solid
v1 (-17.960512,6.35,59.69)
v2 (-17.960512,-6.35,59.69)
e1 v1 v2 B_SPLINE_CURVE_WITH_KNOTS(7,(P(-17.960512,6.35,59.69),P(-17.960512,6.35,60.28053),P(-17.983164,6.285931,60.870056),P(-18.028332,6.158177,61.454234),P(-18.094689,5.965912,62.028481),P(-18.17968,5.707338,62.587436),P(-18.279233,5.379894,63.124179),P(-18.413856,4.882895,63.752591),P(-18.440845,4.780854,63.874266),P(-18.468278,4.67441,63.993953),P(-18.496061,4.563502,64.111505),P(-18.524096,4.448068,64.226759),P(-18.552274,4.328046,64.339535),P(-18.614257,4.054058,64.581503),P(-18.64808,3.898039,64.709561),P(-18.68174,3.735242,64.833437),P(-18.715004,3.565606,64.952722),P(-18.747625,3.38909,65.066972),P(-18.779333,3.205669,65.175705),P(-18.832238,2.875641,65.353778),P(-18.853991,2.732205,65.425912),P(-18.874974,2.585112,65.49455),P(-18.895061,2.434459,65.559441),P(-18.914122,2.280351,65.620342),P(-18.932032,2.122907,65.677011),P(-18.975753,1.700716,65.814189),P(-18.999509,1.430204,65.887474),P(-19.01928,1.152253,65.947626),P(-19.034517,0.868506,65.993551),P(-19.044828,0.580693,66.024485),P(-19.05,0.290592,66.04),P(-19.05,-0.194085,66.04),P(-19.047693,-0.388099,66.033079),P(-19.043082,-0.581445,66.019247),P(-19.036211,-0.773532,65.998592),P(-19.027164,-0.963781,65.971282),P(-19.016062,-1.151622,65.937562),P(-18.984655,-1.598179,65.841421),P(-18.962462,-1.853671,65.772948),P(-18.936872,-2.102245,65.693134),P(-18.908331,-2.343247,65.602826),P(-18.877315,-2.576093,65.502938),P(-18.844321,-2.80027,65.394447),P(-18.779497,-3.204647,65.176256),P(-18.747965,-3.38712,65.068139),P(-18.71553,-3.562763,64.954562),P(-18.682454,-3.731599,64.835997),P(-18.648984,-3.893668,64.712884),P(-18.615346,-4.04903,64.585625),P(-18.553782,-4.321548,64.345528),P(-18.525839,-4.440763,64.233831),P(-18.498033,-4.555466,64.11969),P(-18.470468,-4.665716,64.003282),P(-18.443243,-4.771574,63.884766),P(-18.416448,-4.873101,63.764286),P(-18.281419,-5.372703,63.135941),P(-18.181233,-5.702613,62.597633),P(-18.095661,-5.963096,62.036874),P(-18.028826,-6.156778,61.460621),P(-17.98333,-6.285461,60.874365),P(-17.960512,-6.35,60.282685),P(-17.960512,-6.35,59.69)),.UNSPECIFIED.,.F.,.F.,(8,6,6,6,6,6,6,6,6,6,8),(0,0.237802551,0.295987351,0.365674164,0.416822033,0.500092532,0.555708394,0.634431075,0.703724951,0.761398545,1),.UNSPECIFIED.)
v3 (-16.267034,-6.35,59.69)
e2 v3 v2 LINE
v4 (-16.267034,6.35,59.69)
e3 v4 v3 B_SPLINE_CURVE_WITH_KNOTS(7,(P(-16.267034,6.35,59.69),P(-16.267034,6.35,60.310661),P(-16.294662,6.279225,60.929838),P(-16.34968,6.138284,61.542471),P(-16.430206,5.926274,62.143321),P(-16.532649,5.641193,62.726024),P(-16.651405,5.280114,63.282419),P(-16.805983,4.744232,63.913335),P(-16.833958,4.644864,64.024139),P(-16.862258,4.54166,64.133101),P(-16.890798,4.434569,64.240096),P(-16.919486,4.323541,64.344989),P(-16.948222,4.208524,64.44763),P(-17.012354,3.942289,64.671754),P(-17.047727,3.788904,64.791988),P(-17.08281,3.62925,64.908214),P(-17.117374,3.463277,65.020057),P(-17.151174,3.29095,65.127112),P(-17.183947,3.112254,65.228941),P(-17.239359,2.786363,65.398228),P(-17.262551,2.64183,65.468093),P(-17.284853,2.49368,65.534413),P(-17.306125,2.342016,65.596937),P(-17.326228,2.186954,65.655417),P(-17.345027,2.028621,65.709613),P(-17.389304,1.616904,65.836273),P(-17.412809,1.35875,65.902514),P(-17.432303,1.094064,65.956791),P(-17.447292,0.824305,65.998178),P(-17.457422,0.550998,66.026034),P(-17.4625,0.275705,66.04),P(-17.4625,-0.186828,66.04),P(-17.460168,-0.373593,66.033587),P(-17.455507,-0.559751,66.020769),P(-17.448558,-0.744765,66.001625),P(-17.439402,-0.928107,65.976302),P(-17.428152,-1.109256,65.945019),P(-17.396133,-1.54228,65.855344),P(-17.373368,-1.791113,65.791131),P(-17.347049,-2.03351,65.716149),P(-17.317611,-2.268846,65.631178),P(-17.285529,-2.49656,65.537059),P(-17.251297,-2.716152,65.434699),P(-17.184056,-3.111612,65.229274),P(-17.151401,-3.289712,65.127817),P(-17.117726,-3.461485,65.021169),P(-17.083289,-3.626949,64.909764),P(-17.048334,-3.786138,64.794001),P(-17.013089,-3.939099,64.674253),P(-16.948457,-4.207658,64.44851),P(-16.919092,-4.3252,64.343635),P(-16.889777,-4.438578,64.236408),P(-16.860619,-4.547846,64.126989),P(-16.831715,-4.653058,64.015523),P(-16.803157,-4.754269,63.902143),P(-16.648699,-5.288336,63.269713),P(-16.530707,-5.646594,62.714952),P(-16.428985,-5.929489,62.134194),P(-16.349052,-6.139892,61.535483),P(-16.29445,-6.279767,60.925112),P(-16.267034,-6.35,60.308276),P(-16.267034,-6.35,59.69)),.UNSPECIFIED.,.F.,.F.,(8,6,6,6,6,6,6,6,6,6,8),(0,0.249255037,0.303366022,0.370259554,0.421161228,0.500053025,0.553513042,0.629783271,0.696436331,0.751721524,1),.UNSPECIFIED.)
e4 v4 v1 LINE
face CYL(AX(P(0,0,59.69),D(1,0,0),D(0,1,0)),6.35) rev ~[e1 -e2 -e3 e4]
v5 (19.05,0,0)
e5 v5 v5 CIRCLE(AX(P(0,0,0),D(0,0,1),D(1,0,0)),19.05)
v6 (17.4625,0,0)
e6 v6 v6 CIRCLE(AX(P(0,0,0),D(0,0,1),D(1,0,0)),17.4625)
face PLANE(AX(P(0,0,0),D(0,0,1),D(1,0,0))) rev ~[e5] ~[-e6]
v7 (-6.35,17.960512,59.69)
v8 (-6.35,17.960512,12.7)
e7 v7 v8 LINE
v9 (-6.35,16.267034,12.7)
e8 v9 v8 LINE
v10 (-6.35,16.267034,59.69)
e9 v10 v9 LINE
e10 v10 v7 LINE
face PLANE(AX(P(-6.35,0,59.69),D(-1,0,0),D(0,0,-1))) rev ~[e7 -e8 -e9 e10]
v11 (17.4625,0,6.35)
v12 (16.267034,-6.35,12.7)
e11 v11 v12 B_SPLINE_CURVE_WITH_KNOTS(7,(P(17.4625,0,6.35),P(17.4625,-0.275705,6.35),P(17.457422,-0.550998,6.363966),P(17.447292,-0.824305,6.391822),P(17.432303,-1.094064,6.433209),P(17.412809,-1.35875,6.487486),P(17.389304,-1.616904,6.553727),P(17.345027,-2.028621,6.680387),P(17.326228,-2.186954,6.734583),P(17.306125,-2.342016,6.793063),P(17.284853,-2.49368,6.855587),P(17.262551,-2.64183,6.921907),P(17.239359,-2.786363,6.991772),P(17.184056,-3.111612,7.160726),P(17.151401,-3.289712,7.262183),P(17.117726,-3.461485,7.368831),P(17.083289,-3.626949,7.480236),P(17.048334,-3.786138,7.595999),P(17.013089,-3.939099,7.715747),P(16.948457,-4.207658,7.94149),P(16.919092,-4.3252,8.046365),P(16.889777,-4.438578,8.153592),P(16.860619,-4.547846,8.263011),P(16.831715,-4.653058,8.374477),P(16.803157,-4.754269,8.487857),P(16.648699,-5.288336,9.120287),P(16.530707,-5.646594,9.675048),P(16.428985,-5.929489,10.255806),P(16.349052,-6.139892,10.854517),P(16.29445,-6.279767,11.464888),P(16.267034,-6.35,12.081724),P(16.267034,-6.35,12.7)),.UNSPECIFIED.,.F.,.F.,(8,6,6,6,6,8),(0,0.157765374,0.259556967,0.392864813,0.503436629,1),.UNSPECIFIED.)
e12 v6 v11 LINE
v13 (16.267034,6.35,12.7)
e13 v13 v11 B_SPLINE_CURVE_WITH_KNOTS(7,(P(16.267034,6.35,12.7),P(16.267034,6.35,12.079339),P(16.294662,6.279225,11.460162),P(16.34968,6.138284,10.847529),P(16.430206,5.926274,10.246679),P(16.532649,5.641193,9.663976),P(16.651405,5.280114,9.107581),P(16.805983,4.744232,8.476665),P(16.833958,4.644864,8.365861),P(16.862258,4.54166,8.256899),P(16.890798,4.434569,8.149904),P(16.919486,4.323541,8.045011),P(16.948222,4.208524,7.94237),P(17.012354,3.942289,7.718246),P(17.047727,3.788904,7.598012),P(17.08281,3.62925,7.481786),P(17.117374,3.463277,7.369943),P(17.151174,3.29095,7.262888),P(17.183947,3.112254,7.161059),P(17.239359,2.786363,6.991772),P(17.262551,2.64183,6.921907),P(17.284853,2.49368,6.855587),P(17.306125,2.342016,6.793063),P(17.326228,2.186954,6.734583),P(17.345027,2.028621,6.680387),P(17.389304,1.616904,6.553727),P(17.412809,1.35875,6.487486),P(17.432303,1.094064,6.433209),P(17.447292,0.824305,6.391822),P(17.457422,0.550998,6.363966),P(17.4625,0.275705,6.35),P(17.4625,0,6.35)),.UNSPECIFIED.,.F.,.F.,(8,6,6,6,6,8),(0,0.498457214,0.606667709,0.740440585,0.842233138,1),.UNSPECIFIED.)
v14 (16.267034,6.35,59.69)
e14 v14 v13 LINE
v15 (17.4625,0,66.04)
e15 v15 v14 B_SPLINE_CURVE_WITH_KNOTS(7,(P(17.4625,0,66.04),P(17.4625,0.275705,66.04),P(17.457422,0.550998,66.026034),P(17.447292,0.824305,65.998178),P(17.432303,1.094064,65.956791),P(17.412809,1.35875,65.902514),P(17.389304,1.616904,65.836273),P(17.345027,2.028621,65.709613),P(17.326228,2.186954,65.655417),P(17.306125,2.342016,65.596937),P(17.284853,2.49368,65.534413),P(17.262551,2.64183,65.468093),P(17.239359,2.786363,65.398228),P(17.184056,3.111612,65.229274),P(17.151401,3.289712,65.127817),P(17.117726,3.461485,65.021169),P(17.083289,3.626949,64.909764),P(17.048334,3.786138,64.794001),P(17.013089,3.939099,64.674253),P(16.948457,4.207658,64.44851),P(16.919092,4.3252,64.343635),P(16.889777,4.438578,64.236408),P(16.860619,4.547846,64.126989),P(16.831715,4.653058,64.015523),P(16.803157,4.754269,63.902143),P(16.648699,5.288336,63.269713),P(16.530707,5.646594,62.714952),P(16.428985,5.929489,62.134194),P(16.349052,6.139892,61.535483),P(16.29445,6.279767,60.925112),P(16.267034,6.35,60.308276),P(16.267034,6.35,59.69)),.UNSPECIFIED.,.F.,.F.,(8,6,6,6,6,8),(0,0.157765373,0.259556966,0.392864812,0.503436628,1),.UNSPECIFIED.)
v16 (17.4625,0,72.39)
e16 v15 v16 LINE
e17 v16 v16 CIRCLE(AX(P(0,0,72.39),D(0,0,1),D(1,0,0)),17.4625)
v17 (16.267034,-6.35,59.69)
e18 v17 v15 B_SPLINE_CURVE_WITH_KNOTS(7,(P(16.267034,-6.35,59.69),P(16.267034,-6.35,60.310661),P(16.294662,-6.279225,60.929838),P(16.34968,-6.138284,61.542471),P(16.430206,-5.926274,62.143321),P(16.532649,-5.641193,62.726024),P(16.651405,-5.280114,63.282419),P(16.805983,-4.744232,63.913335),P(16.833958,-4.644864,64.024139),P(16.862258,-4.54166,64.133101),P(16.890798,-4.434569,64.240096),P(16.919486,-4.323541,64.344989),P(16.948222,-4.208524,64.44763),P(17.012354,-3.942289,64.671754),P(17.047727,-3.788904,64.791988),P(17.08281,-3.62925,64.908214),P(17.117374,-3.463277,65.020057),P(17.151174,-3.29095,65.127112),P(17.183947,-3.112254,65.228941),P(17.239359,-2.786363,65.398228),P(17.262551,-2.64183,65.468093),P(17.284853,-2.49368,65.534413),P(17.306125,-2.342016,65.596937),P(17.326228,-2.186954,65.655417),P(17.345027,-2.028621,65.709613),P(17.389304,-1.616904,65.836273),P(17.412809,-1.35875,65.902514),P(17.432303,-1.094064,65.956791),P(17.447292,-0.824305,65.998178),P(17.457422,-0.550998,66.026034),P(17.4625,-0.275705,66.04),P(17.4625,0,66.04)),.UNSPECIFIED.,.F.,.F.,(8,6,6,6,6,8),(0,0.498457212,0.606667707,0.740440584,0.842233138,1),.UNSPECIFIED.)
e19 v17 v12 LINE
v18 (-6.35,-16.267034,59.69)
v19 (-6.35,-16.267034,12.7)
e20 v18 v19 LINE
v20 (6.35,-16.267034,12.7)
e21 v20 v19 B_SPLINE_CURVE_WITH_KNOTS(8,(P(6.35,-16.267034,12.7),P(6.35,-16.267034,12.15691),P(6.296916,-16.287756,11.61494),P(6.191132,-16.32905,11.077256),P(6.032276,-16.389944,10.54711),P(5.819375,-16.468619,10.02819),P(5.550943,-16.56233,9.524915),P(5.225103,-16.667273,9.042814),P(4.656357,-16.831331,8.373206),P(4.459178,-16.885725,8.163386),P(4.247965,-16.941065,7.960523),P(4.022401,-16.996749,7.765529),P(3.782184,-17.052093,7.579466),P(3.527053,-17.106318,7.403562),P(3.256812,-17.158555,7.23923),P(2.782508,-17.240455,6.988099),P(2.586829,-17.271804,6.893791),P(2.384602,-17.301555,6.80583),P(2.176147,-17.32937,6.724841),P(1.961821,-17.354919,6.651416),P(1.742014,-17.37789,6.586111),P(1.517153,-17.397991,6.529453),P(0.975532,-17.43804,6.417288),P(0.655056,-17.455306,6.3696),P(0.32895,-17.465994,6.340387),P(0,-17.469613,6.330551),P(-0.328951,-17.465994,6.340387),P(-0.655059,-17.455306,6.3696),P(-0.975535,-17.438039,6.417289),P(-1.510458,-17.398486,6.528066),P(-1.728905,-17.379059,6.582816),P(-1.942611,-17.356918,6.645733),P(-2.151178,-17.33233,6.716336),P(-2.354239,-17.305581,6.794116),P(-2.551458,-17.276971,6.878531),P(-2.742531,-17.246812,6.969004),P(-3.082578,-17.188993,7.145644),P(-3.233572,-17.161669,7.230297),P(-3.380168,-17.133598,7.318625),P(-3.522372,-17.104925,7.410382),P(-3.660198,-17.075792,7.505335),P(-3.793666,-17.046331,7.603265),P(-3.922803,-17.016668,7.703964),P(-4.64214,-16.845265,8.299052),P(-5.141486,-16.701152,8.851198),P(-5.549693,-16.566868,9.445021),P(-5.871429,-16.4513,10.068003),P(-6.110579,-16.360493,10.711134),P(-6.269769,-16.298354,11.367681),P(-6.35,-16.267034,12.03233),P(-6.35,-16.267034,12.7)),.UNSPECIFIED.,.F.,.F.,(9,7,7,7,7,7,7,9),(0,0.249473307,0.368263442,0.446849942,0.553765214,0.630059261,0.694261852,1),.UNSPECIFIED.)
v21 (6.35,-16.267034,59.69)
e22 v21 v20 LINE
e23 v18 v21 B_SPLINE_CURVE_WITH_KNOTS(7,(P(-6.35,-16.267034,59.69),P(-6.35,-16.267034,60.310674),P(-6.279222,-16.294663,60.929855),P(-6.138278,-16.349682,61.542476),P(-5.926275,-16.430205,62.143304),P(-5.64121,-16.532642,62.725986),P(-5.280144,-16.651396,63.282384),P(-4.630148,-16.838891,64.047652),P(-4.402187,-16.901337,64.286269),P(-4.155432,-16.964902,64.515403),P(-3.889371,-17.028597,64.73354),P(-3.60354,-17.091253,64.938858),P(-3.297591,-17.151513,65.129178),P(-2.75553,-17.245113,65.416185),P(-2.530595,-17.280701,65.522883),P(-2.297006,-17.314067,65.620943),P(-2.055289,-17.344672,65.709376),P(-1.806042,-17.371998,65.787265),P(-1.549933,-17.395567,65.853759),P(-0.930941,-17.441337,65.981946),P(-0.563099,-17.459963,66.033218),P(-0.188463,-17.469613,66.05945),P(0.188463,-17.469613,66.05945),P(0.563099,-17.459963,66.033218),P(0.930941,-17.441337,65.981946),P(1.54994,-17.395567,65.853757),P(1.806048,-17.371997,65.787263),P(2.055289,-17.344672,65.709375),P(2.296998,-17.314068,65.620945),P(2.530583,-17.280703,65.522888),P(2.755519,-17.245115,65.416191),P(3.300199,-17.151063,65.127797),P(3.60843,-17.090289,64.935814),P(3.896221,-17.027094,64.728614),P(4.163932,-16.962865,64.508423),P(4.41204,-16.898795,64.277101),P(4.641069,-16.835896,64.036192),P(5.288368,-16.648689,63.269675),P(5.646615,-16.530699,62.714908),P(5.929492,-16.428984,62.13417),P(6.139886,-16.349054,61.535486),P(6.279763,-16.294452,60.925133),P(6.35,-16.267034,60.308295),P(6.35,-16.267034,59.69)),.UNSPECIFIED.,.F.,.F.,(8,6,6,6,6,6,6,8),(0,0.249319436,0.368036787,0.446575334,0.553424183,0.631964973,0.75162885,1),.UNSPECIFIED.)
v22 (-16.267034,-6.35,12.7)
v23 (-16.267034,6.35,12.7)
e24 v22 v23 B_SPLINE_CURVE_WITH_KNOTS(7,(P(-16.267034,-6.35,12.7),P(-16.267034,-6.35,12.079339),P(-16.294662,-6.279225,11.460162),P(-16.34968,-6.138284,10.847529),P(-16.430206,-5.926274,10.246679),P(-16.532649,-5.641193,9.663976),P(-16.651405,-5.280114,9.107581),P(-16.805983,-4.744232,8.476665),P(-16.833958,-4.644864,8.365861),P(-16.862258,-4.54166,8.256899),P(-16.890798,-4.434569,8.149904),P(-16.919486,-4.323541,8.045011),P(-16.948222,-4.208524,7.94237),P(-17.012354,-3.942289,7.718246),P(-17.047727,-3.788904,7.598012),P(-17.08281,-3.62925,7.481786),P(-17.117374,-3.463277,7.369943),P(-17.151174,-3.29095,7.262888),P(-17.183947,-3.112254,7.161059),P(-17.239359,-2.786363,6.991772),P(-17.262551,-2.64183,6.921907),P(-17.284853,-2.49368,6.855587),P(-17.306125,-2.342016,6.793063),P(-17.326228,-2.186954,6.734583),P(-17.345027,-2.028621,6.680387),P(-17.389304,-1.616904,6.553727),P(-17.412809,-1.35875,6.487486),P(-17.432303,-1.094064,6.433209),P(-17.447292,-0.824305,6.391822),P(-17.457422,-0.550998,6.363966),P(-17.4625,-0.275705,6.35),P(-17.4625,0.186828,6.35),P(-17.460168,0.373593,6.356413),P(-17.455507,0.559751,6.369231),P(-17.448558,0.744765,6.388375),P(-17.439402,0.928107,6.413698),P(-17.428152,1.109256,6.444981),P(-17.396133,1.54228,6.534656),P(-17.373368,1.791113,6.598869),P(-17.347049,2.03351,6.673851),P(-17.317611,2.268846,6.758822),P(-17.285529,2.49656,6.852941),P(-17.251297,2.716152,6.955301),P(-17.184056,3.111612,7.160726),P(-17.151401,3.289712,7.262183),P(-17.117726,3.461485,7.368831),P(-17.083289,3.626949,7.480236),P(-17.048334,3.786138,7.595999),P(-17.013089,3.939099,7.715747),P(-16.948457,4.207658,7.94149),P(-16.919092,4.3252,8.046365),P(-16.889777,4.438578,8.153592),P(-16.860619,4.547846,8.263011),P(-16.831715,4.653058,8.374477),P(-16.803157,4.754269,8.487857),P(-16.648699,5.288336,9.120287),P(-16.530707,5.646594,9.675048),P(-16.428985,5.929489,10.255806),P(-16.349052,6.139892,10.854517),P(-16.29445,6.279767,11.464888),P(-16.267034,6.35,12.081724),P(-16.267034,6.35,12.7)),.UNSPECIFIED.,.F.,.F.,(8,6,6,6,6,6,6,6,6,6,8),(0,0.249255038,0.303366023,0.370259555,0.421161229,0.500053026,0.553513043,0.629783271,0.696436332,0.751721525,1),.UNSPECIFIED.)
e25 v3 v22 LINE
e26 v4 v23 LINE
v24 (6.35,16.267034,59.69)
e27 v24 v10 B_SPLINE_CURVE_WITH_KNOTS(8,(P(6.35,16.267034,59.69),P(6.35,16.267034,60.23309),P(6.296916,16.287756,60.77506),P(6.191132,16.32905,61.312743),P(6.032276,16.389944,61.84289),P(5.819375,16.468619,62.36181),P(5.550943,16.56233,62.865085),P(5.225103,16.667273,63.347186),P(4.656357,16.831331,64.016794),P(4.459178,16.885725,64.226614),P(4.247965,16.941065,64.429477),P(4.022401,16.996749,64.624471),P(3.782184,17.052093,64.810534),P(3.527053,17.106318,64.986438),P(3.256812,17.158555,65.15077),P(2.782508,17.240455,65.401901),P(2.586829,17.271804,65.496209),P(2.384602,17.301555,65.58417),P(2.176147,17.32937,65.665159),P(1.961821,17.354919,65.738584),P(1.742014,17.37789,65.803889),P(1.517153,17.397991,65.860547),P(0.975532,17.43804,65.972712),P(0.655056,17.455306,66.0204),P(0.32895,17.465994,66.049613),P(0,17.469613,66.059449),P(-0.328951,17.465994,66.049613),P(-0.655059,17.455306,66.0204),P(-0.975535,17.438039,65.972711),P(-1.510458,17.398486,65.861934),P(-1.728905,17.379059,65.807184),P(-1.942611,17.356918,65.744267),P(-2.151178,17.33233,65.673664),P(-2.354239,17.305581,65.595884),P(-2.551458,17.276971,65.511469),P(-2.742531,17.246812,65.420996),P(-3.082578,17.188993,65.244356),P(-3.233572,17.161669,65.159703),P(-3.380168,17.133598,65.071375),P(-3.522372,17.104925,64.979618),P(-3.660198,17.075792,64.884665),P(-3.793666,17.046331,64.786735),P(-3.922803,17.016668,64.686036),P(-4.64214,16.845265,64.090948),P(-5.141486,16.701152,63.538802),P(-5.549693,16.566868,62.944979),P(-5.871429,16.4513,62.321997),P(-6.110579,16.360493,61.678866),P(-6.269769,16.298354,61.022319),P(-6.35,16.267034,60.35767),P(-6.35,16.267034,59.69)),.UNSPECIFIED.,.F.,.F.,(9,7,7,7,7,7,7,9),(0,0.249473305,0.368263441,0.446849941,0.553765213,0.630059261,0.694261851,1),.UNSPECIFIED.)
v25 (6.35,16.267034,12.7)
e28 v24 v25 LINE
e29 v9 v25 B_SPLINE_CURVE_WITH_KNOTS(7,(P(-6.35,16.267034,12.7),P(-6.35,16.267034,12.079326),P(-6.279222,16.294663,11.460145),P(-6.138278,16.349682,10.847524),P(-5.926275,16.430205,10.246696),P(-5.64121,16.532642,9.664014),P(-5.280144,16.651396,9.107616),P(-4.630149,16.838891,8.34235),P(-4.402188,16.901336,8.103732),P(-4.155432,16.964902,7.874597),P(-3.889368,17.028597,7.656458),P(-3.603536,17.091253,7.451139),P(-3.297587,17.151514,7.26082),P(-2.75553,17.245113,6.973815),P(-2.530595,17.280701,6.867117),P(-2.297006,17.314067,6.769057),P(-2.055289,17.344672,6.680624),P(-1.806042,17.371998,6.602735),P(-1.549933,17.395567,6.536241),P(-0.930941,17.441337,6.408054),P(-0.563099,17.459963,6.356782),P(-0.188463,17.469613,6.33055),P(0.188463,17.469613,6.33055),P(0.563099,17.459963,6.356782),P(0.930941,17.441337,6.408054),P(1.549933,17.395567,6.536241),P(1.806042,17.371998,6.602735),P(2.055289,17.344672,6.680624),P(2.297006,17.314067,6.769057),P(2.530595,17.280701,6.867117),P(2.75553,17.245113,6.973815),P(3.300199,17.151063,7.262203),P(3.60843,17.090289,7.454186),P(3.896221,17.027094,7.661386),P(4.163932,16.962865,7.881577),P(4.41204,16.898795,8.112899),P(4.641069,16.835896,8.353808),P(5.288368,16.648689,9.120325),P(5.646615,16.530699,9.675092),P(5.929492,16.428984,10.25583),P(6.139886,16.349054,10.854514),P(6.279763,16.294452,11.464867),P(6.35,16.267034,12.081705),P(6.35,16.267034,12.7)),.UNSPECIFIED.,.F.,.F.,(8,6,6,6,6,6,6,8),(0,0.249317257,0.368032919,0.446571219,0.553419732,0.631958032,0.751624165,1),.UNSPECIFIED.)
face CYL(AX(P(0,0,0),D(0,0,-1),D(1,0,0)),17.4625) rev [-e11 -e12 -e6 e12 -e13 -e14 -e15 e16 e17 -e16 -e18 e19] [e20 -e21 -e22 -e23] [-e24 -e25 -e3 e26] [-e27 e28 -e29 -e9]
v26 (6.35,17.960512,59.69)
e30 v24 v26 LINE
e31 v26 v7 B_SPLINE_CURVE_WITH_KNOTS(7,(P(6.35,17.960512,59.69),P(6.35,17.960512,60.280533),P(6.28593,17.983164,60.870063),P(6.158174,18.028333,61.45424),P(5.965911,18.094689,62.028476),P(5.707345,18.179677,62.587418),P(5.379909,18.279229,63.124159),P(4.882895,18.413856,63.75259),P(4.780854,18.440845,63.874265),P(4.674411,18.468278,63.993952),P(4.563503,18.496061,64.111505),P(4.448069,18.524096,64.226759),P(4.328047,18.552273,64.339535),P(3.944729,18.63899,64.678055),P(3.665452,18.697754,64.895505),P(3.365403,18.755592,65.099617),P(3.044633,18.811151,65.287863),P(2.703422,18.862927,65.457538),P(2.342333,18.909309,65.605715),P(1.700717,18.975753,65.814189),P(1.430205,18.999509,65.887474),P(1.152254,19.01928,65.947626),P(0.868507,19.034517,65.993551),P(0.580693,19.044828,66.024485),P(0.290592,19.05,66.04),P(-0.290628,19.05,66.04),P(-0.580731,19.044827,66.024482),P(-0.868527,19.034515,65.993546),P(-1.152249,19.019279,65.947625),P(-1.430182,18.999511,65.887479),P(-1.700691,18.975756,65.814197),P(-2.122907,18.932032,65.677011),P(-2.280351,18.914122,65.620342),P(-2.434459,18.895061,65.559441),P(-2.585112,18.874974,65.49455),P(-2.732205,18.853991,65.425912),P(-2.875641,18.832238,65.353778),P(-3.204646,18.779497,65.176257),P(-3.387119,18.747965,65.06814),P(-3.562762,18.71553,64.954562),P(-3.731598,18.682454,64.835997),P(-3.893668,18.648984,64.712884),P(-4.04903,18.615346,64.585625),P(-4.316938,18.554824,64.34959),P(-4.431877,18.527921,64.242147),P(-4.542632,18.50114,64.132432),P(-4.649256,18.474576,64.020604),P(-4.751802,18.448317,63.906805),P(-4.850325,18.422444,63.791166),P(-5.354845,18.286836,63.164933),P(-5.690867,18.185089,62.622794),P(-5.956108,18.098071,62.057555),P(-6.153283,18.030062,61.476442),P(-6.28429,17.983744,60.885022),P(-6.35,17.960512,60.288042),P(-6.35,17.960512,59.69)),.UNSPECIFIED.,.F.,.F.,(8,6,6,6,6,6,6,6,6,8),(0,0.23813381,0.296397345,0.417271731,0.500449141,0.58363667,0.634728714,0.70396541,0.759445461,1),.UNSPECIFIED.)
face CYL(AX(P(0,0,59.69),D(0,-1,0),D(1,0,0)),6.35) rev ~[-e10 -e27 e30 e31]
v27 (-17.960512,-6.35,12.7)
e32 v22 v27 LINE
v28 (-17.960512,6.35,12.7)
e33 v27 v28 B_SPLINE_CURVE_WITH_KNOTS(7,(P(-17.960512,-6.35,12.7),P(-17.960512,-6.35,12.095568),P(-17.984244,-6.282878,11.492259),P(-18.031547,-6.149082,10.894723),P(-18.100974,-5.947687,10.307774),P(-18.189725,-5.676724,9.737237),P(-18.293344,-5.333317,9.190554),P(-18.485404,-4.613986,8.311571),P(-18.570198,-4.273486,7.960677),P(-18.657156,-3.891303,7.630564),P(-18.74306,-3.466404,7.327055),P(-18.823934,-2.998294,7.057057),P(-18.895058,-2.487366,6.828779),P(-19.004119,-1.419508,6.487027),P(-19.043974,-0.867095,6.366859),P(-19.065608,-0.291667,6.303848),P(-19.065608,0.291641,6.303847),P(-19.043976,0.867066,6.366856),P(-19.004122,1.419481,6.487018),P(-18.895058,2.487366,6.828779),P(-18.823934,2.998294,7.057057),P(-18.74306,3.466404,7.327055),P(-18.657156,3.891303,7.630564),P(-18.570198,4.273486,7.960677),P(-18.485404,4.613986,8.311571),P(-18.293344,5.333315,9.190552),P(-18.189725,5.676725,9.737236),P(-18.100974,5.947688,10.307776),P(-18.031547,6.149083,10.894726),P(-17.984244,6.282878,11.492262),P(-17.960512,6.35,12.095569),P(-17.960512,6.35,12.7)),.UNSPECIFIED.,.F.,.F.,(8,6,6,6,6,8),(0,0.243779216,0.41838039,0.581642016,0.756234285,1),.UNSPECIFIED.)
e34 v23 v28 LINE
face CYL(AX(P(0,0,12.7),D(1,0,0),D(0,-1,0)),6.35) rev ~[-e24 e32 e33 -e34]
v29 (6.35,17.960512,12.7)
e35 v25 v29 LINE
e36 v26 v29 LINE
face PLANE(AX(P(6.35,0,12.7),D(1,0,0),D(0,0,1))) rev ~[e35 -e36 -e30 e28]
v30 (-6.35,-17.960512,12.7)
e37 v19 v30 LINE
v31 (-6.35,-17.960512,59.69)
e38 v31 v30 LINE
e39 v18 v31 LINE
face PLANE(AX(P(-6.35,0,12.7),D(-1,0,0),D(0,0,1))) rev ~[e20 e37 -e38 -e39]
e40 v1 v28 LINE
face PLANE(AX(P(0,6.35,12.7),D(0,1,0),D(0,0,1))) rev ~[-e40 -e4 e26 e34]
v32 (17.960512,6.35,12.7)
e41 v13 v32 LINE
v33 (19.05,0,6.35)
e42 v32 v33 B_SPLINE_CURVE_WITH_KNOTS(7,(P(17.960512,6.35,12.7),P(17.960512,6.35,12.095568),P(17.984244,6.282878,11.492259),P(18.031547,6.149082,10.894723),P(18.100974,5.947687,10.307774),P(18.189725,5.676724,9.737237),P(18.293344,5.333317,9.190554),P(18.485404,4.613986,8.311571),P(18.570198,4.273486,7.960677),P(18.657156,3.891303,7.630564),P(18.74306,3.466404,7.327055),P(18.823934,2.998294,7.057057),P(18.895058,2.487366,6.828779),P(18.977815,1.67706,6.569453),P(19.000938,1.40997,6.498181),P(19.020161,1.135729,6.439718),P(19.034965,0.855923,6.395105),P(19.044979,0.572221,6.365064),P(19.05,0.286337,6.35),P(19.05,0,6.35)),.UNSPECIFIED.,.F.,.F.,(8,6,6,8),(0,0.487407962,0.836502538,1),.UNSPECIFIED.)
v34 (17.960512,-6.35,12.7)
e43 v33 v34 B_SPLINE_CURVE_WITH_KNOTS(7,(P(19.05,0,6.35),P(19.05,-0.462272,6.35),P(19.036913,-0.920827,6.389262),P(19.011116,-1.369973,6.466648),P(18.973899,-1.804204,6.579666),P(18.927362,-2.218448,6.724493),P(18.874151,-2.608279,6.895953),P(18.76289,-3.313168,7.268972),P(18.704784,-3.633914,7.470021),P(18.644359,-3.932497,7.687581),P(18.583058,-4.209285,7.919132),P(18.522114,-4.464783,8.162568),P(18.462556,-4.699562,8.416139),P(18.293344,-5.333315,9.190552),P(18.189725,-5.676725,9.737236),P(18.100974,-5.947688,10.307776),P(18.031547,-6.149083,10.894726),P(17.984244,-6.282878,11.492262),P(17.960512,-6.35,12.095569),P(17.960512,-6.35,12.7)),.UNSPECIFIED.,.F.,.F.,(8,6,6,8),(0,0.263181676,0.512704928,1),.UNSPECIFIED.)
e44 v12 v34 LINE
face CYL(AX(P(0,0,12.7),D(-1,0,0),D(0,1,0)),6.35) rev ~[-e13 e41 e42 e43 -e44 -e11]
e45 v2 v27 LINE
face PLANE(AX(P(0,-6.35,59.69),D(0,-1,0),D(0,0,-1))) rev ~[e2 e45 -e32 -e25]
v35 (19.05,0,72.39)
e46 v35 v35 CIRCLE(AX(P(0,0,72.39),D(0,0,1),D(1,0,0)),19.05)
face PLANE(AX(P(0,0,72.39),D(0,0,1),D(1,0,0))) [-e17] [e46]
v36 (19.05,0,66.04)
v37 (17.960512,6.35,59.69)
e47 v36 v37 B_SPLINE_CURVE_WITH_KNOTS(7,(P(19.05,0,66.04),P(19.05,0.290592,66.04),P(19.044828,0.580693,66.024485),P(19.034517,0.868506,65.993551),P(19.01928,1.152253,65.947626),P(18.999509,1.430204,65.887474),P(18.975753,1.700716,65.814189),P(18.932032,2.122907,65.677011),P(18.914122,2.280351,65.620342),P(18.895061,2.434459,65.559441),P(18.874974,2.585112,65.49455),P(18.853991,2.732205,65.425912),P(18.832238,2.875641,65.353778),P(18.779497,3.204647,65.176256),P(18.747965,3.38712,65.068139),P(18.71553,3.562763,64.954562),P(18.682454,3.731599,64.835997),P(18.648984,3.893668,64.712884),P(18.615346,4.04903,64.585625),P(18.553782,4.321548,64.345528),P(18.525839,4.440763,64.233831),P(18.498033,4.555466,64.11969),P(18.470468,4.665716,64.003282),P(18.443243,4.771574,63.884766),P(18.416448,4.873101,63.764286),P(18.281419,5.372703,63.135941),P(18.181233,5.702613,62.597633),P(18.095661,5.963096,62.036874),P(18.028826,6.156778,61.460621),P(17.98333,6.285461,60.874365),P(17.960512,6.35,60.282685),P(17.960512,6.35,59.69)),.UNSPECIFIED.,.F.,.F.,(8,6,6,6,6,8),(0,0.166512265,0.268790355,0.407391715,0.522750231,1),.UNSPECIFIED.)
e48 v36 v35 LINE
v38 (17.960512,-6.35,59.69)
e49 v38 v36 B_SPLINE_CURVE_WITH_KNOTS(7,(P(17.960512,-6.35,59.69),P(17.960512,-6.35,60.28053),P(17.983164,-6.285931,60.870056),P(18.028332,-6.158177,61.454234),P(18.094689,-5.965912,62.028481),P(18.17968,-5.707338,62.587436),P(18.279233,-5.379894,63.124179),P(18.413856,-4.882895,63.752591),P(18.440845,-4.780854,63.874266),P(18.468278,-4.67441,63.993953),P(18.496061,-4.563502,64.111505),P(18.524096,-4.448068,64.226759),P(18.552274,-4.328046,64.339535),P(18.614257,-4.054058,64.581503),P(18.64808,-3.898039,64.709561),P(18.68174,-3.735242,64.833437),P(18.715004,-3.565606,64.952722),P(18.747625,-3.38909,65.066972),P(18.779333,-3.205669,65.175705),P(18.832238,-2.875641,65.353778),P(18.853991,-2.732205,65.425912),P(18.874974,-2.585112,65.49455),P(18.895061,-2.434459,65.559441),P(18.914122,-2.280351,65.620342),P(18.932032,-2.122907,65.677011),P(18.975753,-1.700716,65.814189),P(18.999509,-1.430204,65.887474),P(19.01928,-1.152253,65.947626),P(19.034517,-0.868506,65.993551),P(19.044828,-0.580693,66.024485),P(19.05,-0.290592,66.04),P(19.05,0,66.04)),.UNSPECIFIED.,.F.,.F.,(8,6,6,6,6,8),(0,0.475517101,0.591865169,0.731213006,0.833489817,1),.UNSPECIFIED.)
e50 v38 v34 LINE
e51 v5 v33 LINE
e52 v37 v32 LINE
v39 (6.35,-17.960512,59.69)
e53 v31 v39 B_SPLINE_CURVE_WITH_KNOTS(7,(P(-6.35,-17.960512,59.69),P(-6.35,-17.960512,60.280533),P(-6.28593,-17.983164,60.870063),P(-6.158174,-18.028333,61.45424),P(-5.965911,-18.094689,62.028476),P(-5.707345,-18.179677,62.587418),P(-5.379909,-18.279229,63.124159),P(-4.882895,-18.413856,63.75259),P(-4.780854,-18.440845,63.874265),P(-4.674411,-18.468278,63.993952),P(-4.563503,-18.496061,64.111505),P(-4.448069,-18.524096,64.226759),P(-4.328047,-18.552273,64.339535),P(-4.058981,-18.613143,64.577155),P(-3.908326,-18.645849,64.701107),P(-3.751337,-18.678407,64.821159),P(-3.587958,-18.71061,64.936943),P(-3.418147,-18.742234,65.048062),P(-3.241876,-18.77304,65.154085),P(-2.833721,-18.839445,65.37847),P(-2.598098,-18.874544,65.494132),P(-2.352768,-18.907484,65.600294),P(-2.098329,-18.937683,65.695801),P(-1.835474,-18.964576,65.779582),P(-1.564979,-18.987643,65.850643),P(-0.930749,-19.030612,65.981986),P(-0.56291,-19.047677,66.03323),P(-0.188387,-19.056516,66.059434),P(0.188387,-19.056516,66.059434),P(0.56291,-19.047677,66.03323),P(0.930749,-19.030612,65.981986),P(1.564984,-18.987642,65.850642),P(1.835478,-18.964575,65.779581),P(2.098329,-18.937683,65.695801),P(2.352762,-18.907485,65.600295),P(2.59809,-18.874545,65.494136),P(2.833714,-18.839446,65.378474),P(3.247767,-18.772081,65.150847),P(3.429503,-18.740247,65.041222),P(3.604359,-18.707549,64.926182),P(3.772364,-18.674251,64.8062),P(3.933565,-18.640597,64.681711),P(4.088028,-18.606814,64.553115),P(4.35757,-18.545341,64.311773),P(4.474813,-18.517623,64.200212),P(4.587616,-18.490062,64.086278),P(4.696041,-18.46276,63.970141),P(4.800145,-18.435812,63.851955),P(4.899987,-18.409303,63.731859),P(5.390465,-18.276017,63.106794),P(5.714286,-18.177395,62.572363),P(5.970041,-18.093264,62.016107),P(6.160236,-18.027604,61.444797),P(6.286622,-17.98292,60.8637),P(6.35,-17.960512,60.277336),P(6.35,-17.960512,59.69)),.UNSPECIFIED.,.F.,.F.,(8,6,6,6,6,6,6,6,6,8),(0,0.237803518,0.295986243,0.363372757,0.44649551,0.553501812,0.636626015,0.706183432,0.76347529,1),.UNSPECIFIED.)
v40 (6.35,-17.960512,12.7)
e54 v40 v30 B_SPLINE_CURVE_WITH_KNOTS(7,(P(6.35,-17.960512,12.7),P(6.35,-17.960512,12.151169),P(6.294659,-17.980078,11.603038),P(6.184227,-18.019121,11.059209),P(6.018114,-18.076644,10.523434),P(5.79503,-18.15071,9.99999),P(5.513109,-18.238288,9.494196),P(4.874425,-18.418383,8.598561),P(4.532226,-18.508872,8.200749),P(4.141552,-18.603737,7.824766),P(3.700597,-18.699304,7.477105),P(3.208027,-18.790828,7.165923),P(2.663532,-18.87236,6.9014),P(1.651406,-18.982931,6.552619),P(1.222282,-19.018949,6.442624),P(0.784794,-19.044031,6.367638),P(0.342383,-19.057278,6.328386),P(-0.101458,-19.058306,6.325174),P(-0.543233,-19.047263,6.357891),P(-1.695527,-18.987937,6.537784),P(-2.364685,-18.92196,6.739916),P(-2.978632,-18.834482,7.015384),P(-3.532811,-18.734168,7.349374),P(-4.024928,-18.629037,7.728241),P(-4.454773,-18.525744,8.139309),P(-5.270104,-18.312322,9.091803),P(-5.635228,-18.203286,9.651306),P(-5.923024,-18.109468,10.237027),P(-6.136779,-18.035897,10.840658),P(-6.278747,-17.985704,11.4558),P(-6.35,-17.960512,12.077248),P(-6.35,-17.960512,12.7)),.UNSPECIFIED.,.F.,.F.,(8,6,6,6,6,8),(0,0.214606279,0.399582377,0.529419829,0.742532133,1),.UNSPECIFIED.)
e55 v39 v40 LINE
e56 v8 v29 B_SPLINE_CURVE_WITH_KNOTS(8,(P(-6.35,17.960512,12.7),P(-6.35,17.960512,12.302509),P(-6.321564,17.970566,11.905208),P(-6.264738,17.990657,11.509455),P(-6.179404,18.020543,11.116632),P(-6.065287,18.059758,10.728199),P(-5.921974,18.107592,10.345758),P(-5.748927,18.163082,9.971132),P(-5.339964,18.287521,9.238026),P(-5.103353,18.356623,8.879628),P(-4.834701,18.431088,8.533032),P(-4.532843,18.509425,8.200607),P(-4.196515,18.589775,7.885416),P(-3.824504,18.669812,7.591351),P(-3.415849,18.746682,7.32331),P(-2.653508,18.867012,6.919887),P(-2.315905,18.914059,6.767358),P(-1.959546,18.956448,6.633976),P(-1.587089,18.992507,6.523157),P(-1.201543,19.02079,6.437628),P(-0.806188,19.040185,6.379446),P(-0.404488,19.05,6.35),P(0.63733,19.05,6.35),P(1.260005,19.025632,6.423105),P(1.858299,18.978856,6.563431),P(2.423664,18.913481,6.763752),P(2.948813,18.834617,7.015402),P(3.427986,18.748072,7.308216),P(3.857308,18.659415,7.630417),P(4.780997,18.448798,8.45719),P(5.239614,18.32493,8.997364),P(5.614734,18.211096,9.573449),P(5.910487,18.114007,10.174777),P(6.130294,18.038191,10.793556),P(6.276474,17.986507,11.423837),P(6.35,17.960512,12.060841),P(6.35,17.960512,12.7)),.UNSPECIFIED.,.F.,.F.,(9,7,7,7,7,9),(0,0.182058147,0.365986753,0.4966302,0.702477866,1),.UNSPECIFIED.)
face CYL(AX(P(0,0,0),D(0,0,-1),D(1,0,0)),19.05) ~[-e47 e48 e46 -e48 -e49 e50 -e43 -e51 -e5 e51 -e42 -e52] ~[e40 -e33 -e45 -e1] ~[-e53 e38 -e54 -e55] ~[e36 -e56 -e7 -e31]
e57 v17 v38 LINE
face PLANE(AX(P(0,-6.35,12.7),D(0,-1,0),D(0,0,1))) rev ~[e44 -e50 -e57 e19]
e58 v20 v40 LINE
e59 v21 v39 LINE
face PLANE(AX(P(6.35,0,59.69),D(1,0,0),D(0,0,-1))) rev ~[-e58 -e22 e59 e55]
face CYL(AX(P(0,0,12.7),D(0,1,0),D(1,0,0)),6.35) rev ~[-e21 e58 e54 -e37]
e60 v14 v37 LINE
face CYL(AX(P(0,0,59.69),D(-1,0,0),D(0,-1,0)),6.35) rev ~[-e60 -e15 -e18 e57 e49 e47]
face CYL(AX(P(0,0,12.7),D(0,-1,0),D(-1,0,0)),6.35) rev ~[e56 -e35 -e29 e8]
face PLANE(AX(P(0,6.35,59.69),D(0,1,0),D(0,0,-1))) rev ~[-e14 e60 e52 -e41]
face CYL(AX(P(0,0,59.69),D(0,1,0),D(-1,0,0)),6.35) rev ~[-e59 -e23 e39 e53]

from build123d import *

# Parameters (mm, degrees)
F0_R            = 19.05
F0_R_2          = 17.4625
F1_DEPTH        = 72.39
F3_DEPTH        = 25.4
F3_COPIES_COUNT = 4


# Not quite as in the source:
# - a pattern or mirror of a feature is missing from the dataset's text; its kind, count and spacing are read off the source's solid


with BuildPart() as f1:
    # F0 (on Top) → F1 (new body)
    with BuildSketch(Plane.XY):
        Circle(F0_R)
        Circle(F0_R_2, mode=Mode.SUBTRACT)
    extrude(amount=F1_DEPTH)

    # F2 (on Front) → F3 (cut)
    with BuildSketch(Plane.XZ):
        with BuildLine():
            Line((-6.35, 59.69), (-6.35, 12.7))
            ThreePointArc((-6.35, 12.7), (0, 6.35), (6.35, 12.7))
            Line((6.35, 12.7), (6.35, 59.69))
            ThreePointArc((6.35, 59.69), (0, 66.04), (-6.35, 59.69))
        make_face()
    f3 = extrude(amount=-F3_DEPTH, mode=Mode.SUBTRACT)

    # F3_copies: F3 ×4 about axis
    f3_copies_axis = Axis((0, 0, 0), (0, 0, 1))
    for i in range(1, F3_COPIES_COUNT):
        add(f3.rotate(f3_copies_axis, i * 360 / F3_COPIES_COUNT), mode=Mode.SUBTRACT)


solid = f1.part
